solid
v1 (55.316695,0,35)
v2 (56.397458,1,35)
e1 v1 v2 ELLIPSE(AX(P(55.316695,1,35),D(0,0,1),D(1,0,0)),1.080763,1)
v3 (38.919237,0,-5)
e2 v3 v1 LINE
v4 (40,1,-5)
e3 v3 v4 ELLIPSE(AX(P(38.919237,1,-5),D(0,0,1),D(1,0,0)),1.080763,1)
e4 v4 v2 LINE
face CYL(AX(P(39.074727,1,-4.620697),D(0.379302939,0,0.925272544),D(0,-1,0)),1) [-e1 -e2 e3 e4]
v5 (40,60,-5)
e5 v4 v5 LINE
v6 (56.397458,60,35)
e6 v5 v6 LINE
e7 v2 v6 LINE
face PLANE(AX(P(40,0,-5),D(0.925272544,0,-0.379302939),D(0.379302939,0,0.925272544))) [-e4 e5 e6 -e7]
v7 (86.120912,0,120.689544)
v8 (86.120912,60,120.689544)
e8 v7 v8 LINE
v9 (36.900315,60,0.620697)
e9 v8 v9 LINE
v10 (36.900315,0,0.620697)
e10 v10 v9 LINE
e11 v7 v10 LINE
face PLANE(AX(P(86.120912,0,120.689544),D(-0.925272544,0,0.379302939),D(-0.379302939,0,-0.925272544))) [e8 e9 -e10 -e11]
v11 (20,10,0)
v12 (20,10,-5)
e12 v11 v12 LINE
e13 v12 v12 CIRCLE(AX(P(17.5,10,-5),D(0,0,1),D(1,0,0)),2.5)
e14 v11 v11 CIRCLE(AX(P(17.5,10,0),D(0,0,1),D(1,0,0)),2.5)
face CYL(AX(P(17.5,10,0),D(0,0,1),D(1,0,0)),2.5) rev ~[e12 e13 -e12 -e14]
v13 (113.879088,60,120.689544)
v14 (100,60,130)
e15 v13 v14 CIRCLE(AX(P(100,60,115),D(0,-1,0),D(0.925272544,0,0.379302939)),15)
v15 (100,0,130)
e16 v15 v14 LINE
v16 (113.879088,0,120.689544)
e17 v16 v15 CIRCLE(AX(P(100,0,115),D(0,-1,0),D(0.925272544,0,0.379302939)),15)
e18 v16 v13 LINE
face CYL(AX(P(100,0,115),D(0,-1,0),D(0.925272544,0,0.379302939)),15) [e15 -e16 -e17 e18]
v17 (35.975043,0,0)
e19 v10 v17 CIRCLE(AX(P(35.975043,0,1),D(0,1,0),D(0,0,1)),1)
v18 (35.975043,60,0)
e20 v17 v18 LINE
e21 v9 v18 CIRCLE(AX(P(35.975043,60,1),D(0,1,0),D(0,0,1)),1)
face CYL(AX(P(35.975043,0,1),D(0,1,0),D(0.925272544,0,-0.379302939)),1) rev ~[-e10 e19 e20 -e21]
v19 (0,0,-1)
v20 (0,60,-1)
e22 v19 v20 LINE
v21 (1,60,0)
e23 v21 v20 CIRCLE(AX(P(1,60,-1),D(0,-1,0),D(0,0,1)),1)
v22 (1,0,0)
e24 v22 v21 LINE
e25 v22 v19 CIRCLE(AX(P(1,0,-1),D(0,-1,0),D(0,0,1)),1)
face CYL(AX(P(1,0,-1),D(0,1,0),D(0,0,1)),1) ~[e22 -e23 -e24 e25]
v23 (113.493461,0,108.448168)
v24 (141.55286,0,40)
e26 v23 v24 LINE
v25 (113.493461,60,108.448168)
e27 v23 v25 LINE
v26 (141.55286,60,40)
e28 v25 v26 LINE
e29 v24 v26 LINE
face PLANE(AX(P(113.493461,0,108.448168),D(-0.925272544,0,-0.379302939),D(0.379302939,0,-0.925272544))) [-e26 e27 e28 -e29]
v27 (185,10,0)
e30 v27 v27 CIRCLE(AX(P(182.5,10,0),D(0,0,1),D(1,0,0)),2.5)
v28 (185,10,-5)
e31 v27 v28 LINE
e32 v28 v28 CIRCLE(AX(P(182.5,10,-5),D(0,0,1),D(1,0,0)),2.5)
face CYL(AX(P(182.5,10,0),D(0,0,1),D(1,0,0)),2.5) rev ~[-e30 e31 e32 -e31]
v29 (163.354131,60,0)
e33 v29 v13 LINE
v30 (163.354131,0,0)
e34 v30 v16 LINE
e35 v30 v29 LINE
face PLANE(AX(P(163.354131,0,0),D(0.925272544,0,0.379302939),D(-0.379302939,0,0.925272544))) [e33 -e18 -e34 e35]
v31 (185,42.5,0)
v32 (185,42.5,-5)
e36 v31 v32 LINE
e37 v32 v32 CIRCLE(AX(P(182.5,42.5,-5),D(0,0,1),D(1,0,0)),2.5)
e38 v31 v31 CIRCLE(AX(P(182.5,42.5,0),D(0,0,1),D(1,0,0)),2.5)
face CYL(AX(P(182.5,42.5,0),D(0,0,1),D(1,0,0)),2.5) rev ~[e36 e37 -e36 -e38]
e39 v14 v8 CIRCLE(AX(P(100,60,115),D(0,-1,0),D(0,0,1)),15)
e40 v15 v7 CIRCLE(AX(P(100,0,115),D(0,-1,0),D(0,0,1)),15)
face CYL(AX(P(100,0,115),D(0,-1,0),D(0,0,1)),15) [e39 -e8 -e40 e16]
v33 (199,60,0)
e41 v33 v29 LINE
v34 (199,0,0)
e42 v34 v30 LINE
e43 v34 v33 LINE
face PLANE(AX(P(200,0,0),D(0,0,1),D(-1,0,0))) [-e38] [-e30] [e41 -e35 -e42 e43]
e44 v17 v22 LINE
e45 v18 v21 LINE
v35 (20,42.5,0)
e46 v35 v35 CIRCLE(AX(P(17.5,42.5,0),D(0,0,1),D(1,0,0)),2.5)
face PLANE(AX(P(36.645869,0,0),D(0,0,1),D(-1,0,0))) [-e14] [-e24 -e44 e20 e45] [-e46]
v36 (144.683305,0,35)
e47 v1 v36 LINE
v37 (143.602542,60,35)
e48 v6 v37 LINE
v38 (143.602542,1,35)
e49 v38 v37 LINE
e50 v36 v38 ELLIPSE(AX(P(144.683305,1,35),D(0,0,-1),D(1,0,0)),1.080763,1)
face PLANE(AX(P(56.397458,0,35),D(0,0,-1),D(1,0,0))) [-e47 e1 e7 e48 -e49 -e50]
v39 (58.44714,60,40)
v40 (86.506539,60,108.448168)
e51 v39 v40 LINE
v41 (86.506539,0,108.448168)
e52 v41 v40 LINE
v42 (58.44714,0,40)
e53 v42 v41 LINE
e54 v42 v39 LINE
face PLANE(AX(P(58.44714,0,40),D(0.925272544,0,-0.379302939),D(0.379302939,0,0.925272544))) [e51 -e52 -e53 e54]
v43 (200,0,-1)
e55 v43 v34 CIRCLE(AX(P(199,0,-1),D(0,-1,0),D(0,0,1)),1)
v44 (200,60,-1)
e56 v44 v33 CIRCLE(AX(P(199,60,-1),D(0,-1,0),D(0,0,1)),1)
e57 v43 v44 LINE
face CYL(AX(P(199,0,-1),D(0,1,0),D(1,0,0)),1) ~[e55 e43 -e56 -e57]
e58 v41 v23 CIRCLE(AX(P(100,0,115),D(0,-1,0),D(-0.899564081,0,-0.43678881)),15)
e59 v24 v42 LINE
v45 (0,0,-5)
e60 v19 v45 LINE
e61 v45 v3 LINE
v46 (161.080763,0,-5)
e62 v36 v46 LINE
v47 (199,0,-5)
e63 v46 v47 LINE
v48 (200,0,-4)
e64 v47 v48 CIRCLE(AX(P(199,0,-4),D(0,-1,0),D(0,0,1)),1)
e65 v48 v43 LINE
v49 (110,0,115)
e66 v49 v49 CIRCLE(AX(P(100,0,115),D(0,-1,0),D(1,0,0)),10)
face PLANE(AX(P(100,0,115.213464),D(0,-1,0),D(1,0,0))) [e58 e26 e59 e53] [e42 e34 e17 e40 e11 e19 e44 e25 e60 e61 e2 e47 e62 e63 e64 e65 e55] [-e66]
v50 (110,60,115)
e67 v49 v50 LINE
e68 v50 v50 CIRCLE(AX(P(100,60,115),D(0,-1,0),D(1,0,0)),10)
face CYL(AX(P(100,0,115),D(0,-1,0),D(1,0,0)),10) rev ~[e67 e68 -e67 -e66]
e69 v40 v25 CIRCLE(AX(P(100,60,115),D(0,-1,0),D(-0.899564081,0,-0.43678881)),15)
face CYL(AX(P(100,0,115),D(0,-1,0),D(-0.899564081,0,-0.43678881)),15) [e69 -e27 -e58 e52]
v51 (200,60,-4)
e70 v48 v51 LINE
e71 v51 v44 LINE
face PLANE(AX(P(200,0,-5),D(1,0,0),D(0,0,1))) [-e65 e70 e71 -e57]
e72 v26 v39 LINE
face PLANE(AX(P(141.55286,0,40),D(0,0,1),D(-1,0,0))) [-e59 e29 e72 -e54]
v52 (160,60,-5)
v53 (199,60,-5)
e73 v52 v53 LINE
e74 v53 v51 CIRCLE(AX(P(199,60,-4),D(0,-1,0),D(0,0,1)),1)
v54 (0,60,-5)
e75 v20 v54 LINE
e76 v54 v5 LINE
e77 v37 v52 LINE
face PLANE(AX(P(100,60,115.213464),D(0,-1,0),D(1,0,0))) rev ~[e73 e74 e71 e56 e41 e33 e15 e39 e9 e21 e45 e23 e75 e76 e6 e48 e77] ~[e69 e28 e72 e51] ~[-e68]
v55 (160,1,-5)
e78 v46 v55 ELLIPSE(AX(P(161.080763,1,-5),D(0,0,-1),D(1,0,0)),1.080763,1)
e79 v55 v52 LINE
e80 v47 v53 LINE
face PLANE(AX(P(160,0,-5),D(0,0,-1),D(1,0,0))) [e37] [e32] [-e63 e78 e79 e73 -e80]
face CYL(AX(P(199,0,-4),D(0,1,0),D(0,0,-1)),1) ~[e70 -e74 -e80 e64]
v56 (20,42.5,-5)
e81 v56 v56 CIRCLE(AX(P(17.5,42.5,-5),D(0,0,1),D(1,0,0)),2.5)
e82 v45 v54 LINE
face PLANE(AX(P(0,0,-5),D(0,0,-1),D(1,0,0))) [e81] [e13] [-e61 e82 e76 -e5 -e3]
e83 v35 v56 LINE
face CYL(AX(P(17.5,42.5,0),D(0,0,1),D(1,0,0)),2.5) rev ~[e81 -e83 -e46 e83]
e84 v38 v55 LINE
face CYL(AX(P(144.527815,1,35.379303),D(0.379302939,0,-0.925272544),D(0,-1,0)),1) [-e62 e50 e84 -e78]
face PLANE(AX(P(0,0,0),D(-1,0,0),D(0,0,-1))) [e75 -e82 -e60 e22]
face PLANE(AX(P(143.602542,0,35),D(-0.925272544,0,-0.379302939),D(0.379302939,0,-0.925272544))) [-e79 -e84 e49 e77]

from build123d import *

# Parameters (mm, degrees)
F0_R     = 10
F1_DEPTH = 60
F2_R     = 2.5
F3_DEPTH = 5.001
F4_R     = 1


with BuildPart() as f1:
    # F0 (on Front) → F1 (new body)
    with BuildSketch(Plane.XZ):
        with BuildLine():
            ThreePointArc((86.1209118397, 120.6895440801), (85.0074372508, 114.5277053764), (86.5065387851, 108.4481678561))
            ThreePointArc((86.5065387851, 108.4481678561), (100, 100), (113.4934612149, 108.4481678561))
            ThreePointArc((113.4934612149, 108.4481678561), (114.9925627492, 114.5277053764), (113.8790881603, 120.6895440801))
            ThreePointArc((113.8790881603, 120.6895440801), (108.356340072, 127.4567885348), (100, 130))
            ThreePointArc((100, 130), (91.643659928, 127.4567885348), (86.1209118397, 120.6895440801))
        make_face()
        with Locations((100, 115)):
            Circle(F0_R, mode=Mode.SUBTRACT)
        with BuildLine():
            Line((58.4471400894, 40), (86.5065387851, 108.4481678561))
            ThreePointArc((86.5065387851, 108.4481678561), (85.0074372508, 114.5277053764), (86.1209118397, 120.6895440801))
            Line((86.1209118397, 120.6895440801), (36.6458690181, 0))
            Line((36.6458690181, 0), (0, 0))
            Line((0, 0), (0, -5))
            Line((0, -5), (40, -5))
            Line((40, -5), (56.3974578573, 35))
            Line((56.3974578573, 35), (143.6025421427, 35))
            Line((143.6025421427, 35), (160, -5))
            Line((160, -5), (200, -5))
            Line((200, -5), (200, 0))
            Line((200, 0), (163.3541309819, 0))
            Line((163.3541309819, 0), (113.8790881603, 120.6895440801))
            ThreePointArc((113.8790881603, 120.6895440801), (114.9925627492, 114.5277053764), (113.4934612149, 108.4481678561))
            Line((113.4934612149, 108.4481678561), (141.5528599106, 40))
            Line((141.5528599106, 40), (58.4471400894, 40))
        make_face()
    extrude(amount=-F1_DEPTH)

    # F2 (on face) → F3 (cut, through all)
    with BuildSketch(Plane.XY):
        with Locations((182.5, 10)):
            Circle(F2_R)
        with Locations((182.5, 42.5)):
            Circle(F2_R)
        with Locations((17.5, 10)):
            Circle(F2_R)
        with Locations((17.5, 42.5)):
            Circle(F2_R)
    extrude(amount=-F3_DEPTH, mode=Mode.SUBTRACT)

    # F4
    f4_edges = [f1.edges().sort_by_distance(p)[0] for p in [
        (200, 30, 0),
        (200, 30, -5),
        (0, 30, 0),
        (151.801271, 0, 15),
        (48.198729, 0, 15),
        (36.645869, 30, 0),
    ]]
    fillet(f4_edges, radius=F4_R)


solid = f1.part
